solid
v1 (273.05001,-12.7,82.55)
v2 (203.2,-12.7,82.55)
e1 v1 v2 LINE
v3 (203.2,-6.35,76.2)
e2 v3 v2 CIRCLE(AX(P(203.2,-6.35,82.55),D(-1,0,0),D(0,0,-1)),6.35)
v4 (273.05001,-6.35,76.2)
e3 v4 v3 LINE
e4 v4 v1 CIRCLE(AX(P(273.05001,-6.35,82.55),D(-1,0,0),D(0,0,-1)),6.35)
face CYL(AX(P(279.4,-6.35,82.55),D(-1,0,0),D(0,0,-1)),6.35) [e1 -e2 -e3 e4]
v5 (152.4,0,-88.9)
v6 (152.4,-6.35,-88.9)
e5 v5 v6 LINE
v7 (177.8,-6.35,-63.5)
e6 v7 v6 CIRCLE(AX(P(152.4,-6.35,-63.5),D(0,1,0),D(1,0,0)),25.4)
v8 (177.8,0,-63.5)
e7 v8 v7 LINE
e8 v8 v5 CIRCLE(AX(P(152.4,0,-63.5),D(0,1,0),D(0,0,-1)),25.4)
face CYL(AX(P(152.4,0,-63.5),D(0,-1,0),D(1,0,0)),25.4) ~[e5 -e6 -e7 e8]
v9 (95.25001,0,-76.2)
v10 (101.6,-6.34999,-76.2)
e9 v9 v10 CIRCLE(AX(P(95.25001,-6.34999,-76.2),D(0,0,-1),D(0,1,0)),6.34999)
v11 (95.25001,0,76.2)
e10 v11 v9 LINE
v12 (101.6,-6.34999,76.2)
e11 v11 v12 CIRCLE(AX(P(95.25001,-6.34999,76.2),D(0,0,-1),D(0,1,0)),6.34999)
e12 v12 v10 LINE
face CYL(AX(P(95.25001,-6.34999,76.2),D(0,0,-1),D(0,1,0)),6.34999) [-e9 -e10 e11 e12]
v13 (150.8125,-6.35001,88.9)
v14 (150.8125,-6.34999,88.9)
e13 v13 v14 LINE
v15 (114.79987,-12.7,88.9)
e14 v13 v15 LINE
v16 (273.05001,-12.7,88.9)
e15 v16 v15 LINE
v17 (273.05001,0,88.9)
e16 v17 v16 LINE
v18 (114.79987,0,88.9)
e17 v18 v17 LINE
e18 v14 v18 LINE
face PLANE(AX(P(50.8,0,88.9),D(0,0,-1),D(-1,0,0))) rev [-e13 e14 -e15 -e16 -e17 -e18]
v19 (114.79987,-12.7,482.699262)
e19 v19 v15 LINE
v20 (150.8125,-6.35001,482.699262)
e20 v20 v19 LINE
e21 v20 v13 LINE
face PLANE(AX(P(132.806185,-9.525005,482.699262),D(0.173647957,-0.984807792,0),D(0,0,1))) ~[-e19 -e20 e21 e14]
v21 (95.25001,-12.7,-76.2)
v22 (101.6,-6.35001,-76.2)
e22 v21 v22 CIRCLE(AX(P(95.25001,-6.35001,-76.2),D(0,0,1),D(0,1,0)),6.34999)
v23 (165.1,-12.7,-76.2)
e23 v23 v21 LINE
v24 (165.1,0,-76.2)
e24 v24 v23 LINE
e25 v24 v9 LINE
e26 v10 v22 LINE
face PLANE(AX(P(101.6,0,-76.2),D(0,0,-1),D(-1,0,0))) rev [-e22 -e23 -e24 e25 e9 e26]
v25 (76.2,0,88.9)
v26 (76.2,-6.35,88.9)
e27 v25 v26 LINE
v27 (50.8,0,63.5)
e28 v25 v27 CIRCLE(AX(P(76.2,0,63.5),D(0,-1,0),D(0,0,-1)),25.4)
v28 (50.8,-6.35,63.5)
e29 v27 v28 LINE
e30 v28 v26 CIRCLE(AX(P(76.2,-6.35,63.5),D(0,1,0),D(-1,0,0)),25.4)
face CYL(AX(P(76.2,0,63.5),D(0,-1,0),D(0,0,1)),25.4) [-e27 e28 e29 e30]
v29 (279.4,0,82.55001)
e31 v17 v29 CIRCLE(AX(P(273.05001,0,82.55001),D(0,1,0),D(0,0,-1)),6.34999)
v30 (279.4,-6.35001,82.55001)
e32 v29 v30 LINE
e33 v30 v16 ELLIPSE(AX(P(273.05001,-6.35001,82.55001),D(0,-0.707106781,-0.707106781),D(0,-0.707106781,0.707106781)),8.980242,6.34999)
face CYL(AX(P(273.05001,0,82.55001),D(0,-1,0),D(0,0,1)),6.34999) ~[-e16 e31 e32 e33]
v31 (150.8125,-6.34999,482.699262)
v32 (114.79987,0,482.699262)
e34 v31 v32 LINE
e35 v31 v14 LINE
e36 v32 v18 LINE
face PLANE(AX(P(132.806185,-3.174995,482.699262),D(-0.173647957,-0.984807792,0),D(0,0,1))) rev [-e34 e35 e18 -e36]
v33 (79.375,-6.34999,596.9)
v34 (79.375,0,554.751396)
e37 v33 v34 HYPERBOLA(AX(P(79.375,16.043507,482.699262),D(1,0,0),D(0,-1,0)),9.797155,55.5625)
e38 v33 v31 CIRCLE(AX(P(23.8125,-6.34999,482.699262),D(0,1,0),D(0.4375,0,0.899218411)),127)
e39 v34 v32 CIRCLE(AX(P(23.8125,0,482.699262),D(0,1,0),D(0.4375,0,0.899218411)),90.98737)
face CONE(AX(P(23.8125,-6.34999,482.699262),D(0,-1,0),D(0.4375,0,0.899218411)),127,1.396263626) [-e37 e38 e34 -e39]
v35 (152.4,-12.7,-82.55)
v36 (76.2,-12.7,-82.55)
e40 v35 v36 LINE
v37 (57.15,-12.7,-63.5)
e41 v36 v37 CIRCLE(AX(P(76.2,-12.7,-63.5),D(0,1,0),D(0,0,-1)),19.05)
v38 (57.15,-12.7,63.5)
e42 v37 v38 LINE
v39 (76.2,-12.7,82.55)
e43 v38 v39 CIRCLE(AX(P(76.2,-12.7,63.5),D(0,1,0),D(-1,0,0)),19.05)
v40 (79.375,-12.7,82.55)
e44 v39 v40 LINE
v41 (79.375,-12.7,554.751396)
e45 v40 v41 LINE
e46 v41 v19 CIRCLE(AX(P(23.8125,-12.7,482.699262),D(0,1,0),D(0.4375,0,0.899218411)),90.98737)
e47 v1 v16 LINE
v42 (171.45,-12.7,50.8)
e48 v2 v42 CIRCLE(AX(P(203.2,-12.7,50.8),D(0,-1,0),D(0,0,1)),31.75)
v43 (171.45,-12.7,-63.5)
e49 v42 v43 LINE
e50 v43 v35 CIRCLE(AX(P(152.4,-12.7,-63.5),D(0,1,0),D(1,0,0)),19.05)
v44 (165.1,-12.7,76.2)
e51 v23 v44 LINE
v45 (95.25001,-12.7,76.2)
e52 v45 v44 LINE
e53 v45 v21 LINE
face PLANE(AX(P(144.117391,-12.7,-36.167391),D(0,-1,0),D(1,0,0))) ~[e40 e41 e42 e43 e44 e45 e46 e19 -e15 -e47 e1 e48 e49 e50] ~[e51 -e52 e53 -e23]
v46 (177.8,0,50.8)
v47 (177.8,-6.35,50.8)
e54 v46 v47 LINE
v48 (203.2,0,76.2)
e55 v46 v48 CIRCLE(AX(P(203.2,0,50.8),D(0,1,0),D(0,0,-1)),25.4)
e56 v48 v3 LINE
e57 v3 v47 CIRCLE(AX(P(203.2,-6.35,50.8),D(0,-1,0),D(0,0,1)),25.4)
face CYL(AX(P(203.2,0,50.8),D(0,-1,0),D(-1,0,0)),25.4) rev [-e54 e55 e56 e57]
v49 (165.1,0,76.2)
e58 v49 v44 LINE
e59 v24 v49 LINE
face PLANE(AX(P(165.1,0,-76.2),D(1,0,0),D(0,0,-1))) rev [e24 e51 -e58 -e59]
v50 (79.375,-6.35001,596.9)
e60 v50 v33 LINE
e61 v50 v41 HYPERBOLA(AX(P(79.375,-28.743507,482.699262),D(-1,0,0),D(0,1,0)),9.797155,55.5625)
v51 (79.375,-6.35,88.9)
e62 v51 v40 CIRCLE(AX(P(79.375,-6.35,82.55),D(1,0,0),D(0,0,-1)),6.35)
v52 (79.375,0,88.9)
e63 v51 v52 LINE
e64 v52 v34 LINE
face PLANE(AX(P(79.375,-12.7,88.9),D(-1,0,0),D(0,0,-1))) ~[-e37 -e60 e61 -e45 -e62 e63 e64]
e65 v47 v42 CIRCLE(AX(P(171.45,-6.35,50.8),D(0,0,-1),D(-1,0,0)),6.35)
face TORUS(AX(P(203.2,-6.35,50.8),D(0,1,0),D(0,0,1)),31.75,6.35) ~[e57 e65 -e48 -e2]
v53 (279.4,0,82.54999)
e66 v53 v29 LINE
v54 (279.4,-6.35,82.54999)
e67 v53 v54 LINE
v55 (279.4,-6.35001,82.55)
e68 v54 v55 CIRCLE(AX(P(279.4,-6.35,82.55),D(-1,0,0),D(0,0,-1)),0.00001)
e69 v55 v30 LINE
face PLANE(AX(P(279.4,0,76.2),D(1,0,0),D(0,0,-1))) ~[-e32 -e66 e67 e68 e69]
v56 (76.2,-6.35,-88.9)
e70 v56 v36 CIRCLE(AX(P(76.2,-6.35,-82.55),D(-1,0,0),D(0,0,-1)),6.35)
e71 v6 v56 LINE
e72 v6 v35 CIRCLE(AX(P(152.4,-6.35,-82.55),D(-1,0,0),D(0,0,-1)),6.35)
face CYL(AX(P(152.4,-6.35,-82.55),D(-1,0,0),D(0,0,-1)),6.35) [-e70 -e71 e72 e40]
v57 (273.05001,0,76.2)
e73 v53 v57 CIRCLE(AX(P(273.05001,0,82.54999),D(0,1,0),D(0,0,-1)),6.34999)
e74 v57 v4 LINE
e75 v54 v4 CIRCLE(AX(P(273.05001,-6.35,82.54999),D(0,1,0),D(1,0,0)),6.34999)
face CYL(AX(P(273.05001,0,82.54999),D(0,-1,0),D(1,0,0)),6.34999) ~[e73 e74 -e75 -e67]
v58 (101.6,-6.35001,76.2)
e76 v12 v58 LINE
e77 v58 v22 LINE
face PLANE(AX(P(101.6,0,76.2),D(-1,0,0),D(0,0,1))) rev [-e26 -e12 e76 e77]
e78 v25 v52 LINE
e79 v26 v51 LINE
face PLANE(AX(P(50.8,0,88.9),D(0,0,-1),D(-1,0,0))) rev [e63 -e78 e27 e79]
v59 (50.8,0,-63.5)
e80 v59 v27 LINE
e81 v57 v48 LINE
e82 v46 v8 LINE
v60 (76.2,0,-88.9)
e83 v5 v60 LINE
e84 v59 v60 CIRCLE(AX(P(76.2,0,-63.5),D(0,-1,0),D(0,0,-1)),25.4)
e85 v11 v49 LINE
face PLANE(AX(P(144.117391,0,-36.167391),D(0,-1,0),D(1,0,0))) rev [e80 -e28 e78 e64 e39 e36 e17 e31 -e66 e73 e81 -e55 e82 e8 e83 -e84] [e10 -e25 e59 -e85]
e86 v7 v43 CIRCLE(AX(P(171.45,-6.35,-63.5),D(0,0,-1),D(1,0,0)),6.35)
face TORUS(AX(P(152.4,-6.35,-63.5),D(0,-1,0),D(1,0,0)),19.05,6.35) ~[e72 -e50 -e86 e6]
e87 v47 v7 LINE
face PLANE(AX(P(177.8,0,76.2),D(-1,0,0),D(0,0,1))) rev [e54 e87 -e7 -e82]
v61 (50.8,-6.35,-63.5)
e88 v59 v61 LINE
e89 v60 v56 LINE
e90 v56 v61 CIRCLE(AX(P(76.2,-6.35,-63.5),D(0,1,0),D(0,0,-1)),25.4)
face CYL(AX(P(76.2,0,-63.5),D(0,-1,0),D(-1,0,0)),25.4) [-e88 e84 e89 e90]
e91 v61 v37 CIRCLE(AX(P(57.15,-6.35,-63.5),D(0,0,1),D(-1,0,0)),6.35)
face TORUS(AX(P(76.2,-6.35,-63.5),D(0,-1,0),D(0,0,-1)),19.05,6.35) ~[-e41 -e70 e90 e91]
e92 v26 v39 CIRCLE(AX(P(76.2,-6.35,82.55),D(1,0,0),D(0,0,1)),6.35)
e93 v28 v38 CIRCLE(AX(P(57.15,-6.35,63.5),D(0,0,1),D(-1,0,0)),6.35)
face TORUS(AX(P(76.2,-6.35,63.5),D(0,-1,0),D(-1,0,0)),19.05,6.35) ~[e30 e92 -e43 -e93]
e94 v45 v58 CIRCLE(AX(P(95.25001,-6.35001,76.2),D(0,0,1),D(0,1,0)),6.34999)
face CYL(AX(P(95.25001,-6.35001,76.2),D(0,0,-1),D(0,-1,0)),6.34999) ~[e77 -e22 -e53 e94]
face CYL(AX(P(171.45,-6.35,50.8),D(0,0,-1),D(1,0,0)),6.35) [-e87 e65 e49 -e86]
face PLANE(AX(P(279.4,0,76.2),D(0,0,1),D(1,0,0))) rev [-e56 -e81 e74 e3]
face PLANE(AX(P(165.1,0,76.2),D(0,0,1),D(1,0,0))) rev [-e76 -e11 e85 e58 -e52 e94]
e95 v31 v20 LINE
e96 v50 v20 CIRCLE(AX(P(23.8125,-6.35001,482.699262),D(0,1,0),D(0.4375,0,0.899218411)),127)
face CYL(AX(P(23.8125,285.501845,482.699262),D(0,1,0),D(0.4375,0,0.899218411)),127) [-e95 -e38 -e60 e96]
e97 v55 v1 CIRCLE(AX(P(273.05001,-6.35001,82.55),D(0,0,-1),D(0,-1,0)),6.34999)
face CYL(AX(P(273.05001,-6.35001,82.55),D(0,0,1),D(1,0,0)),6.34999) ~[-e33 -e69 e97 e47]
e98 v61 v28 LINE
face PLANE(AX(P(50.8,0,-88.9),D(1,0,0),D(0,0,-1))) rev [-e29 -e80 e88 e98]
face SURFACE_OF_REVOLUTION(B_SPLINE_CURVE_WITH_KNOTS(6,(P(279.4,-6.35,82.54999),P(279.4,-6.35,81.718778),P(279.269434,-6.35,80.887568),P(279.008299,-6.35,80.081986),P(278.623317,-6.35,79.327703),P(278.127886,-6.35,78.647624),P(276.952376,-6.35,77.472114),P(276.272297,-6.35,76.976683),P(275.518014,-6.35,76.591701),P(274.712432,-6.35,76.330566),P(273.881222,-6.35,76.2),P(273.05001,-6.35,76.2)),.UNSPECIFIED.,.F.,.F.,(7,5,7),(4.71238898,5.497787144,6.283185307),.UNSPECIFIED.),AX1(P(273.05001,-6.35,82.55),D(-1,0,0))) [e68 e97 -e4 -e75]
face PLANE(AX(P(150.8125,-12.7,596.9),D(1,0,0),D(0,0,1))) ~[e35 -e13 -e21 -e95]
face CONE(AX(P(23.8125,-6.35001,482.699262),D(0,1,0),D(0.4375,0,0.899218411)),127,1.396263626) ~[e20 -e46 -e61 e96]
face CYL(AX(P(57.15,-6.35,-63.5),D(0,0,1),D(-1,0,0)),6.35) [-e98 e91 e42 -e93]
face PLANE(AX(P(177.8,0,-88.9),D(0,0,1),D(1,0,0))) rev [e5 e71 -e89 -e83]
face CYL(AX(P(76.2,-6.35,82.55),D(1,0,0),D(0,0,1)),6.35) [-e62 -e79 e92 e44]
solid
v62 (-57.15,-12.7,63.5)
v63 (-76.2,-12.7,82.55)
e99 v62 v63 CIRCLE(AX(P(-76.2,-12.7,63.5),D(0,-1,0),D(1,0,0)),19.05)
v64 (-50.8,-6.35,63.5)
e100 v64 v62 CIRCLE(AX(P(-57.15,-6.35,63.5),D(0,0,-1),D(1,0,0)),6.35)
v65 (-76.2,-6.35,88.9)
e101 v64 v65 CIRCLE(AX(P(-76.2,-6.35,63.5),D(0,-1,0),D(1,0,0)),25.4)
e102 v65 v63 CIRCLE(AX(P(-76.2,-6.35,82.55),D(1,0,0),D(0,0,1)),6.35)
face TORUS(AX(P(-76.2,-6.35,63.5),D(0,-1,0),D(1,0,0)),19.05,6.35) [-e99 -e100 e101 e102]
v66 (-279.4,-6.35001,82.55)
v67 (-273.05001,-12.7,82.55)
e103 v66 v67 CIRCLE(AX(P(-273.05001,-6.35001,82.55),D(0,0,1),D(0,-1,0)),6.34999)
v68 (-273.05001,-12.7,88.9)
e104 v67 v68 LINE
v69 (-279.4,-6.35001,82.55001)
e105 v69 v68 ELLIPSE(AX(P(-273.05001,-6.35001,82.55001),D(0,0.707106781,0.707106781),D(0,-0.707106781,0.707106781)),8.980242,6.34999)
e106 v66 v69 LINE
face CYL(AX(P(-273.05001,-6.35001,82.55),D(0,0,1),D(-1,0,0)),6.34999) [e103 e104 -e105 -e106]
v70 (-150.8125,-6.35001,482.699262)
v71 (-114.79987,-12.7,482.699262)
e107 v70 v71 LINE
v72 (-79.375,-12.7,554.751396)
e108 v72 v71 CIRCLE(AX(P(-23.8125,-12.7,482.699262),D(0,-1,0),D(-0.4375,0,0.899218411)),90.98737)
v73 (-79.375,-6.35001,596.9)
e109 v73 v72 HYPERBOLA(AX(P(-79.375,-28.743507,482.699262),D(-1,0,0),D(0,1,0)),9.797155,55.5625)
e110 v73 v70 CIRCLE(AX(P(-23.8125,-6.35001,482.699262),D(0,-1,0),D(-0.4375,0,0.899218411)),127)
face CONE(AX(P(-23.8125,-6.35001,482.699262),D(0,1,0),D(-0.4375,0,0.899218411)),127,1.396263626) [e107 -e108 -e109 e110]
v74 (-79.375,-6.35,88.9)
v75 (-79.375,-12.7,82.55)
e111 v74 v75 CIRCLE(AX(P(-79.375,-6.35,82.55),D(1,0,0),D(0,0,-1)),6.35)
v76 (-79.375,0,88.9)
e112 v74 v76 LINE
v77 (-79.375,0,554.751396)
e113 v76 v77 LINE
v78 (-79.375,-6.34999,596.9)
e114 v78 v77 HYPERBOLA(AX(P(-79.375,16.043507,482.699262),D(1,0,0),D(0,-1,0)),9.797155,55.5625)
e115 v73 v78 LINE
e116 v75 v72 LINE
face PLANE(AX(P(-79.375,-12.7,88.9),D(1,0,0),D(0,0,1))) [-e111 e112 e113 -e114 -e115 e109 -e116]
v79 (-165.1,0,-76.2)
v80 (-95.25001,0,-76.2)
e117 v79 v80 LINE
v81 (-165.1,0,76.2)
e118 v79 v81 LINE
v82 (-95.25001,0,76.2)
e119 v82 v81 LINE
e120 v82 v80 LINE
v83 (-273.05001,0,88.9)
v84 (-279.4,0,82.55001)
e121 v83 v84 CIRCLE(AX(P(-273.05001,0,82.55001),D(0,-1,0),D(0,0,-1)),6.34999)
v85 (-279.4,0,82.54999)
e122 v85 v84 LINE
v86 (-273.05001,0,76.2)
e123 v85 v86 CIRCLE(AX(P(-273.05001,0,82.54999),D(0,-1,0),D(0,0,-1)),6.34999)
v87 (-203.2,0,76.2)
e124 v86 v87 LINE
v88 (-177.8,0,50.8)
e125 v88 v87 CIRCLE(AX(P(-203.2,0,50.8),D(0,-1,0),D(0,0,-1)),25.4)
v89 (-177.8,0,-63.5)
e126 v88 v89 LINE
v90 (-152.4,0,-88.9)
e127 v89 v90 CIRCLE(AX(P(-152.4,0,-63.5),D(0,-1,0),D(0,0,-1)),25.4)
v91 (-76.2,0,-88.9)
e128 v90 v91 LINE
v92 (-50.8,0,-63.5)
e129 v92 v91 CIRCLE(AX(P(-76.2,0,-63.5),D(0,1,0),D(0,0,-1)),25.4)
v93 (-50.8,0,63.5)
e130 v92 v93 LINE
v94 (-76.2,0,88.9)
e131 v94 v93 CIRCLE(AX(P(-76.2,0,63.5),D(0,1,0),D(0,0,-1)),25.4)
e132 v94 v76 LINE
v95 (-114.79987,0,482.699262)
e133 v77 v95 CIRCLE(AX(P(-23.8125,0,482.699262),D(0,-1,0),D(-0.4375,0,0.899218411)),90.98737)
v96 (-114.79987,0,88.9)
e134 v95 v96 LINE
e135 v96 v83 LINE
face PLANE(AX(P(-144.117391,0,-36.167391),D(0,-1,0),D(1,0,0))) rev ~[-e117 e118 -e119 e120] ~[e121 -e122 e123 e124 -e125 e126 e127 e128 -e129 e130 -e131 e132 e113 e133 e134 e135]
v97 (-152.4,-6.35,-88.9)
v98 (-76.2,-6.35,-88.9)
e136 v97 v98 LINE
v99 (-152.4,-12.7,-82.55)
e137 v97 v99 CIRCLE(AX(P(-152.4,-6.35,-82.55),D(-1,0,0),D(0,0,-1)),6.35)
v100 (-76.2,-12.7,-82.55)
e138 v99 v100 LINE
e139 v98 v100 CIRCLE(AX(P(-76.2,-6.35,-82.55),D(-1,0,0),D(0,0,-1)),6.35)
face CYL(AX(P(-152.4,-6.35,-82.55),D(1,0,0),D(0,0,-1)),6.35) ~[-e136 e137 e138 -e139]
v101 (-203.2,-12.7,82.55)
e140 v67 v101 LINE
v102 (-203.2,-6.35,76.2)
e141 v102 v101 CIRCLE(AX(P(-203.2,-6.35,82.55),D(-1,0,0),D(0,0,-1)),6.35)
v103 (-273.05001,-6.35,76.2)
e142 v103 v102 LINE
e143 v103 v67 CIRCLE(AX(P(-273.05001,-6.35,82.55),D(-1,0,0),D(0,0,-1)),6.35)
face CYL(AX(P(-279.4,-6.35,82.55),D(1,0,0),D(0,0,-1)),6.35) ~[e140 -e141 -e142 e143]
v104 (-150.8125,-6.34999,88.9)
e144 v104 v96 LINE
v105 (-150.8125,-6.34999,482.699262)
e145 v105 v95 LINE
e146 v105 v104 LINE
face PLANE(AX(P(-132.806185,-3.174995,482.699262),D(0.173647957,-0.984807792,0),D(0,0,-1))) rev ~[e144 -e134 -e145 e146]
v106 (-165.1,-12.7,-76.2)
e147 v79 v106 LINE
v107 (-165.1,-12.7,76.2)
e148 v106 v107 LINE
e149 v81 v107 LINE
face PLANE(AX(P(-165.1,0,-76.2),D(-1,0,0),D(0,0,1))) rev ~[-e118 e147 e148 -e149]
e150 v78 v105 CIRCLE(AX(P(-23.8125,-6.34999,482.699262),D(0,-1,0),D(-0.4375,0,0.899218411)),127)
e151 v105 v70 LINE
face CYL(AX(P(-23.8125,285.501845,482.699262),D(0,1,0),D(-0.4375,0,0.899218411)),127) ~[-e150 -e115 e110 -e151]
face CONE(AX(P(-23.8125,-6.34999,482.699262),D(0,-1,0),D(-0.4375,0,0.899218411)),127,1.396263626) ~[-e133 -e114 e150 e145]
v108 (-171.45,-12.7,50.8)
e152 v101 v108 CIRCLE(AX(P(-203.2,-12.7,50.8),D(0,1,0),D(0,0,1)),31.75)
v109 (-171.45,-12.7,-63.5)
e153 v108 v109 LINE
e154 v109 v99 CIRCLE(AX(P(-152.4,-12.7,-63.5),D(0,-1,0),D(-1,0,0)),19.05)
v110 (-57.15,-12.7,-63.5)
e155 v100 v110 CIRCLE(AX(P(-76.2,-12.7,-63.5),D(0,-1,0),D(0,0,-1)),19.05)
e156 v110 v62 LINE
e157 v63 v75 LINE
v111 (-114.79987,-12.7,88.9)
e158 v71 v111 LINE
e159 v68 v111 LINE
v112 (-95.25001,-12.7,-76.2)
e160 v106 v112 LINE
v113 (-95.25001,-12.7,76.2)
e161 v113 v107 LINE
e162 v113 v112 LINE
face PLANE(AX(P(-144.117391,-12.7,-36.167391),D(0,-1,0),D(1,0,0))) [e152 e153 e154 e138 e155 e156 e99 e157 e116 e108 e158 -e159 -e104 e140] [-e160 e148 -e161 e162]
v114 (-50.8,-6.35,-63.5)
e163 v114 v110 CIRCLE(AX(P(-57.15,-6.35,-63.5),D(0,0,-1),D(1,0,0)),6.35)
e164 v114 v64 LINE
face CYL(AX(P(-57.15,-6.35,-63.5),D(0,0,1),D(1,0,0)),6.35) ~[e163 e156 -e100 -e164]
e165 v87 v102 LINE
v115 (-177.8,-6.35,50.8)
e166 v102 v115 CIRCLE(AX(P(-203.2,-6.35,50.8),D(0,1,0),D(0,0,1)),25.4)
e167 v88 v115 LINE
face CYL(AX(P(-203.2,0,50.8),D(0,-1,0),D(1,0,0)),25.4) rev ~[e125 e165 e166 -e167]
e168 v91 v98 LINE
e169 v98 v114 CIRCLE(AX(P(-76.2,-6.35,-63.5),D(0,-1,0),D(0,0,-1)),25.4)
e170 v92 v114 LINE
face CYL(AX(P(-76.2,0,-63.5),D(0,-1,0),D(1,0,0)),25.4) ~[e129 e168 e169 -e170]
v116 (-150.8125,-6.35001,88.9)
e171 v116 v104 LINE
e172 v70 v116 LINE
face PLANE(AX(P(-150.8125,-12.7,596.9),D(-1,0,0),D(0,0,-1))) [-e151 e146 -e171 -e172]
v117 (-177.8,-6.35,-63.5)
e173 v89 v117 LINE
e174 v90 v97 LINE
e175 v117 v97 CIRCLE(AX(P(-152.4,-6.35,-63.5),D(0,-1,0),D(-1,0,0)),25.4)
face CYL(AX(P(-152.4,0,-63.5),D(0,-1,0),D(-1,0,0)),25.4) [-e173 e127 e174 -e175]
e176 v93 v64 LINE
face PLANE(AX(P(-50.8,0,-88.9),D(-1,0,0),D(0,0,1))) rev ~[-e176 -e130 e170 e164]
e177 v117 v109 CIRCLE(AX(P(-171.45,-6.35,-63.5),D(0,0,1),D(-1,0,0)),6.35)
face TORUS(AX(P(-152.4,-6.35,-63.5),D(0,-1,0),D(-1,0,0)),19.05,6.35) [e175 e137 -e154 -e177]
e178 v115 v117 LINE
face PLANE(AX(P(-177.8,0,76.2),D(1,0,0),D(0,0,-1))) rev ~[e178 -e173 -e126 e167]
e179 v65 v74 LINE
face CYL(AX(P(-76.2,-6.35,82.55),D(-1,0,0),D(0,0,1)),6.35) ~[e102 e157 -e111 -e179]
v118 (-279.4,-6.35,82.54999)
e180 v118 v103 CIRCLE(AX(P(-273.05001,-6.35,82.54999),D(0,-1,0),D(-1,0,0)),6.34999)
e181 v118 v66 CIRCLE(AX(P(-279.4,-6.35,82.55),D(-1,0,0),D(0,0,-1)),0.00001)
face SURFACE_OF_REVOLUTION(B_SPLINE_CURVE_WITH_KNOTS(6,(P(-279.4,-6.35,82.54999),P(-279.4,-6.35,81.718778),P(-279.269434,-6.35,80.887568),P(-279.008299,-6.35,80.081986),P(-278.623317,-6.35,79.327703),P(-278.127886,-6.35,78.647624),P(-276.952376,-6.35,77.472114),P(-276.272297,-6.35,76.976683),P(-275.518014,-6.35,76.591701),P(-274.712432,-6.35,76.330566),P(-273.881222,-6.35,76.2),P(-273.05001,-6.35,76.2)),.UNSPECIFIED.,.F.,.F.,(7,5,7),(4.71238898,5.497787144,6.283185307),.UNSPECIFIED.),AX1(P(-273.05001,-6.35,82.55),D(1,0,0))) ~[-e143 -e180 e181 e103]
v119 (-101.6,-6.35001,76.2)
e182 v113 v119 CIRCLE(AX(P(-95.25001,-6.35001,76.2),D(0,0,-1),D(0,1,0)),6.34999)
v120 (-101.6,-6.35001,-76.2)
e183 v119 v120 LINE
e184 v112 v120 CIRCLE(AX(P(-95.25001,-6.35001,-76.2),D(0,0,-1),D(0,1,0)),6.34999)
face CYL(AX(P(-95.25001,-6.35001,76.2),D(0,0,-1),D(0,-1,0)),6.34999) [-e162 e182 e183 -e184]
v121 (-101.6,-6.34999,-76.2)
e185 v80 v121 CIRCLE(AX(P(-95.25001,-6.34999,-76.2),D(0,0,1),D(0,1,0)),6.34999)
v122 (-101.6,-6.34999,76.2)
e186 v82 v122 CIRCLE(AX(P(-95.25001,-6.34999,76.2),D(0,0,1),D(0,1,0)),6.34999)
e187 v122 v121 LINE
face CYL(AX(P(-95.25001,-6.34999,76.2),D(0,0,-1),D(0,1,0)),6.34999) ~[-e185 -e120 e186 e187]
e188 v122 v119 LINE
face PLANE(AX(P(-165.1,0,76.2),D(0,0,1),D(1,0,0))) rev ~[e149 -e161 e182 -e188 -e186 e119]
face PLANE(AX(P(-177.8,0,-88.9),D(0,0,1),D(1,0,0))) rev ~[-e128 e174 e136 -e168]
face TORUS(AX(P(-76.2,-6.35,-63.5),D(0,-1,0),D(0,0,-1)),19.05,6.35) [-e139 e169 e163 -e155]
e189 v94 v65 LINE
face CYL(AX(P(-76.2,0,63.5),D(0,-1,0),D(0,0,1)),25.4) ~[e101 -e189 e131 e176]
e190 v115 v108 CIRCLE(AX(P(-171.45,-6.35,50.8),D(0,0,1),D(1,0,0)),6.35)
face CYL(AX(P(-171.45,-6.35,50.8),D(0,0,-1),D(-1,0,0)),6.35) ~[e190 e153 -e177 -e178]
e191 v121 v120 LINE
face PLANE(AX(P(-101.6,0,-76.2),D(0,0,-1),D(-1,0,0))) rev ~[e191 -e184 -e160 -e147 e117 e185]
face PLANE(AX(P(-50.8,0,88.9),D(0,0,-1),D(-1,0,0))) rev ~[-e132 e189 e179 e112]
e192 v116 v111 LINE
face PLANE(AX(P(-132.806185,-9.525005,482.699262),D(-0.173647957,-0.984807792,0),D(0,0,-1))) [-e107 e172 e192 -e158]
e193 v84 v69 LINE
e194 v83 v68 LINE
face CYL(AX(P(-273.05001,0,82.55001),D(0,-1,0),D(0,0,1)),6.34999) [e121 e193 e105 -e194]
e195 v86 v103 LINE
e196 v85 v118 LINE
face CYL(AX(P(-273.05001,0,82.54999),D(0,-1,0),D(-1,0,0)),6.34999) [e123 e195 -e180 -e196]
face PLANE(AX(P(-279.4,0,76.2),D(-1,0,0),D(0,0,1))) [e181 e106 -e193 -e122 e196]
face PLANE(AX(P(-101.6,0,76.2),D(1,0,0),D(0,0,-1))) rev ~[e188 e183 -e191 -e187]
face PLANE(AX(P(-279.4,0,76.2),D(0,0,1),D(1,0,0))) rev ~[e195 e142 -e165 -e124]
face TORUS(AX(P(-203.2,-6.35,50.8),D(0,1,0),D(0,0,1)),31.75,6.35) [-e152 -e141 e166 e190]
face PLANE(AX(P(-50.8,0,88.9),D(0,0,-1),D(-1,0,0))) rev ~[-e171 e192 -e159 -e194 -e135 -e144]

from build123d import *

# Parameters (mm, degrees)
F0_W        = 101.6
F0_H        = 12.7
F1_DEPTH    = 12.7
F3_DEPTH    = 12.7
F4_T1_DEPTH = 583.7036907444
F5_R        = 6.34999
F6_R        = 25.4
F7_R        = 6.35
F8_R        = 6.34999
F9_SIZE2    = 36.01263
F9_SIZE     = 6.34999


# Not quite as in the source:
# - a fillet or chamfer that OpenCascade refuses, or shapes differently, is made with other operations: its cross-section is extruded or revolved along the edge and cut away or added
# - a fillet or chamfer is up to 0.001 mm smaller than in the source, because OpenCascade refuses the exact size


with BuildPart() as f1:
    # F0 (on Front) → F1 (new body)
    with BuildSketch(Plane.XZ):
        Polygon((-50.8, -88.9), (-50.8, -76.2), (-101.6, -76.2), (-165.1, -76.2), (-165.1, 76.2), (-177.8, 76.2), (-177.8, -88.9), align=None)
        Polygon((-101.6, -76.2), (-50.8, -76.2), (-50.8, 0), (-50.8, 76.2), (-101.6, 76.2), align=None)
        Polygon((-165.1, 76.2), (-101.6, 76.2), (-50.8, 76.2), (-50.8, 88.9), (-177.8, 88.9), (-177.8, 76.2), align=None)
        with Locations((-228.6, 82.55)):
            Rectangle(F0_W, F0_H)
    extrude(amount=F1_DEPTH)

    # F2 (on face) → F3 (join)
    with BuildSketch(Plane.XZ.offset(12.7)):
        Polygon((-107.95, 88.9), (-79.375, 88.9), (-79.375, 596.9), (-150.8125, 596.9), (-150.8125, 88.9), (-136.525, 88.9), align=None)
    extrude(amount=-F3_DEPTH)

    # F4: fillet of radius 127 on 1 edges, made by hand

    # F4_s2 → F4_t1 (cut)
    with BuildSketch(Plane.XZ.offset(-285.5018453722)):
        with BuildLine():
            ThreePointArc((-79.375, 596.9), (-131.4819884821, 550.0511827591), (-150.8125, 482.6992618511))
            Line((-150.8125, 482.6992618511), (-150.8125, 596.9))
            Line((-150.8125, 596.9), (-79.375, 596.9))
        make_face()
    extrude(amount=F4_T1_DEPTH, mode=Mode.SUBTRACT)

    # F5 (radius 6.35 in the source; OpenCascade refuses exactly that, so slightly less here)
    f5_edges = [f1.edges().sort_by_distance(p)[0] for p in [
        (-101.6, -12.7, 0),
        (-101.6, 0, 0),
    ]]
    fillet(f5_edges, radius=F5_R)

    # F6
    f6_edges = [f1.edges().sort_by_distance(p)[0] for p in [
        (-50.8, -6.35, 88.9),
        (-50.8, -6.35, -88.9),
        (-177.8, -6.35, -88.9),
        (-177.8, -6.35, 76.2),
    ]]
    fillet(f6_edges, radius=F6_R)

    # F7
    f7_edges = [f1.edges().sort_by_distance(p)[0] for p in [
        (-50.8, -12.7, 0),
    ]]
    fillet(f7_edges, radius=F7_R)

    # F8 (radius 6.35 in the source; OpenCascade refuses exactly that, so slightly less here)
    f8_edges = [f1.edges().sort_by_distance(p)[0] for p in [
        (-279.4, -12.7, 85.725),
        (-279.4, -6.35, 88.9),
        (-279.4, -3.175, 76.2),
        (-279.4, -10.840128, 78.059872),
    ]]
    fillet(f8_edges, radius=F8_R)

    # F9 (size 6.35 and 36.0126395546 in the source; OpenCascade refuses exactly that, so slightly less here)
    f9_edges = [f1.edges().sort_by_distance(p)[0] for p in [
        (-150.8125, -12.7, 285.799631),
        (-150.8125, 0, 285.799631),
    ]]
    f9_side = f1.faces().sort_by_distance((-150.8125, -6.35, 285.799631))[0]
    chamfer(f9_edges, length=F9_SIZE, length2=F9_SIZE2, reference=f9_side)


with BuildPart() as f10_1:
    # F10: instance of F1
    add(f1.part.mirror(Plane.YZ))


solid = Compound([f1.part, f10_1.part])
